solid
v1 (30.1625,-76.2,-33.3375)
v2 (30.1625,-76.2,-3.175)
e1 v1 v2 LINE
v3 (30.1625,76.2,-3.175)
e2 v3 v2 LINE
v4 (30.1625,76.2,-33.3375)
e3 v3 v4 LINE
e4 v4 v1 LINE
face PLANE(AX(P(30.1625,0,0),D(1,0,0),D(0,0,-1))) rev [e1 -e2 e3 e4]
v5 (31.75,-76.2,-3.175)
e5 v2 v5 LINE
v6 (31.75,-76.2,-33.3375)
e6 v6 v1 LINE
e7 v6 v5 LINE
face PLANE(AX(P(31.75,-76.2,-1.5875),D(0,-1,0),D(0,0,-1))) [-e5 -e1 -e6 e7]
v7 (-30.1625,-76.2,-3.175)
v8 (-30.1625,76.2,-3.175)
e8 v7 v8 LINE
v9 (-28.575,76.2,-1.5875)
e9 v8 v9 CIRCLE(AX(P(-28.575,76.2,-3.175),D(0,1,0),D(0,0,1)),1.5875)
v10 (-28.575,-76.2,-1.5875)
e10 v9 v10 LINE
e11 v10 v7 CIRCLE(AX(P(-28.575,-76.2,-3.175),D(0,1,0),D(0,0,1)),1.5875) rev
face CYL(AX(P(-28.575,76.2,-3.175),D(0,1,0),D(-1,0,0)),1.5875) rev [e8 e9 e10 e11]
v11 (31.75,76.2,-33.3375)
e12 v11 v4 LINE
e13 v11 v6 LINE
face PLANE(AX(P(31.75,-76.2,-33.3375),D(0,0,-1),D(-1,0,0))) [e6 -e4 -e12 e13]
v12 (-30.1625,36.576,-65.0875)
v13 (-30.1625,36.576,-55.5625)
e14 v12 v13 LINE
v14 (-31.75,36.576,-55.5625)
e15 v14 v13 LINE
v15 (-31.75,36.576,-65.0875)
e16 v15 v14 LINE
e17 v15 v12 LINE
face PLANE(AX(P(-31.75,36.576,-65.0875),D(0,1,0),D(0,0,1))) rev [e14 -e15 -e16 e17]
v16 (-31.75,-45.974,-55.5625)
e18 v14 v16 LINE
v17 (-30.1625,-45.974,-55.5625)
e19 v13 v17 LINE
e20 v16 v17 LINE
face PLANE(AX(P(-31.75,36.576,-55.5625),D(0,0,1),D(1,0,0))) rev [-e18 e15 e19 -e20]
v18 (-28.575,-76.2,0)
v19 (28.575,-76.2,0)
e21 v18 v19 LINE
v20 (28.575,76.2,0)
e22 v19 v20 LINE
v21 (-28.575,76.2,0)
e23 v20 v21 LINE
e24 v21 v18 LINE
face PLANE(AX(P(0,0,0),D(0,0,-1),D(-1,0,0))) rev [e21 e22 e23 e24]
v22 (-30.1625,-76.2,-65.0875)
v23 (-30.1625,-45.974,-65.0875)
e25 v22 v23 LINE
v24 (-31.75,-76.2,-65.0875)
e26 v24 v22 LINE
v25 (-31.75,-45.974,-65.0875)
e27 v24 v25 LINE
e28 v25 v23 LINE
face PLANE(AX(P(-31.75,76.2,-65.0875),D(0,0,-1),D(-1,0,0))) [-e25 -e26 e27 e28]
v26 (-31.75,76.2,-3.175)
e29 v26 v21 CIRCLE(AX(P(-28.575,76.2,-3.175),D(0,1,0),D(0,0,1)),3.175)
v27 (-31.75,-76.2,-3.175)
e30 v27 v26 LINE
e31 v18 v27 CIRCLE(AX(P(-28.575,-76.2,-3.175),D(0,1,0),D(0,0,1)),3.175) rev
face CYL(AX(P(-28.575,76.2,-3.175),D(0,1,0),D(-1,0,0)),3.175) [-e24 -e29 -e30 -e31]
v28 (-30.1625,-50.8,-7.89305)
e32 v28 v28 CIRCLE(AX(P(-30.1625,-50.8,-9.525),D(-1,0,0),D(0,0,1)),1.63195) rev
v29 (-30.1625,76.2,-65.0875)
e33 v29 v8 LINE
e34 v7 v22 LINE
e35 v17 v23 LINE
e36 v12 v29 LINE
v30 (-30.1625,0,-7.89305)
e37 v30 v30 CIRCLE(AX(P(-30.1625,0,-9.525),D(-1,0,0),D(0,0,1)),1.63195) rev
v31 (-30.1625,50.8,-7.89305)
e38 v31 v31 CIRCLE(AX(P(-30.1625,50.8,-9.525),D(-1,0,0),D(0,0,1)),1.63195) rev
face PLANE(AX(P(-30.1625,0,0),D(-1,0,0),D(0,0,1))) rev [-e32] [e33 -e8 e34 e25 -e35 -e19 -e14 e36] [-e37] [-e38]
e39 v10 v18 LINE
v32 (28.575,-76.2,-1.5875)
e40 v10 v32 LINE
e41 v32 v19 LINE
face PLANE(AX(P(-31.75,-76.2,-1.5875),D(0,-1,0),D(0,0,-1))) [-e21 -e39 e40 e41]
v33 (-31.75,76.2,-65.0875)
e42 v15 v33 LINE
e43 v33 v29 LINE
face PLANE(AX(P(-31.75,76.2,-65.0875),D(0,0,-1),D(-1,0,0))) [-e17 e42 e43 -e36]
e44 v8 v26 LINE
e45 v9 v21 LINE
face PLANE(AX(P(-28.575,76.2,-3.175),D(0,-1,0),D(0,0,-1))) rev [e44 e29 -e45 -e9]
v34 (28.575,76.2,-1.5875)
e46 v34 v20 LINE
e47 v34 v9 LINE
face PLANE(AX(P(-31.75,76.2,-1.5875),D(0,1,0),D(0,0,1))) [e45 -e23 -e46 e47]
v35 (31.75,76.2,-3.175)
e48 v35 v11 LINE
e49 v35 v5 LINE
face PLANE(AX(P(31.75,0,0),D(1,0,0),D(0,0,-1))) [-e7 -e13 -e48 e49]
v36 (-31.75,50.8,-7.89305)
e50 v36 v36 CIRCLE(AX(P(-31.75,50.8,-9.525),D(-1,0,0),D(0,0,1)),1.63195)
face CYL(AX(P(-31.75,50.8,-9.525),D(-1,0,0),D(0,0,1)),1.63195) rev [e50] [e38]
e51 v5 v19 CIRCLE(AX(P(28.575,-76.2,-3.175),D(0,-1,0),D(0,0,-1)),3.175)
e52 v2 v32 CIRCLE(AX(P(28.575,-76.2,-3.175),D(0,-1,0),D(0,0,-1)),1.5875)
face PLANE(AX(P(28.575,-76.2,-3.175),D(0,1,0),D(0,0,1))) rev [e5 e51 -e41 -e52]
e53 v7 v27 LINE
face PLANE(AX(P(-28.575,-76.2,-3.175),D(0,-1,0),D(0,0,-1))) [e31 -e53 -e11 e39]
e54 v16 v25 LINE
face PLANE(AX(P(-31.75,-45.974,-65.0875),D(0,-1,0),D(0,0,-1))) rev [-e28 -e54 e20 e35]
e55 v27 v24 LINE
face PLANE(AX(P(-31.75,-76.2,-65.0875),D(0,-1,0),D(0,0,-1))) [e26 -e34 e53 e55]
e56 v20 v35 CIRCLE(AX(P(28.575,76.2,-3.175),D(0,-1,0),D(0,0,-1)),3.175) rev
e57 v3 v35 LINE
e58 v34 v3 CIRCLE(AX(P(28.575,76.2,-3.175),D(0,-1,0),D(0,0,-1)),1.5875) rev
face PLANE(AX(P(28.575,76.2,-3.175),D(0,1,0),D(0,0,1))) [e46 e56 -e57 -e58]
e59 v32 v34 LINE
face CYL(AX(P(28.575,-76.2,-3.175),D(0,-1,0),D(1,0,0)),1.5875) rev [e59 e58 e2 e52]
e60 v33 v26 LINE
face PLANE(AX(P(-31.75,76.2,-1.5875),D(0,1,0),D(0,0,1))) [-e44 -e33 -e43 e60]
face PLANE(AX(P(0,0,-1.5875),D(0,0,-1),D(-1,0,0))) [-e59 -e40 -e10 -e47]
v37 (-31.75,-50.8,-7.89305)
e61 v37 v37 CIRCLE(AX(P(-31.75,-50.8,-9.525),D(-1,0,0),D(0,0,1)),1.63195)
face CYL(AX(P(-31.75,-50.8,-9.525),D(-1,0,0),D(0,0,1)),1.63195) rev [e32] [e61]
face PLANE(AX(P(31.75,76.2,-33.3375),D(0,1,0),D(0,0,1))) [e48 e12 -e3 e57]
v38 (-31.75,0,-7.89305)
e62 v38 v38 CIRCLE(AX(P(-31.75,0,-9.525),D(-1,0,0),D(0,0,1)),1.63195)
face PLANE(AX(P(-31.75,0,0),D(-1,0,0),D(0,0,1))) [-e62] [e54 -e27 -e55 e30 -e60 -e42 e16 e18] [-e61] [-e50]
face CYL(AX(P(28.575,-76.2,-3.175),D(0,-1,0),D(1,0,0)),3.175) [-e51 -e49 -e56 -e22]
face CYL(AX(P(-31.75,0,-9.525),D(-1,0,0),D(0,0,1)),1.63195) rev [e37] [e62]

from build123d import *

# Parameters (mm, degrees)
SKETCH1_W                    = 63.5
SKETCH1_H                    = 152.4
BASE_FLANGE1_DEPTH           = 1.5875
EDGE_FLANGE1_STRIP_W         = 9.525
EDGE_FLANGE1_STRIP_H         = 1.5875
EDGE_FLANGE1_STRIP_CUT_DEPTH = 152.4
EDGE_FLANGE1_DEPTH           = 152.4
EDGE_FLANGE2_STRIP_W         = 9.525
EDGE_FLANGE2_STRIP_H         = 1.5875
EDGE_FLANGE2_STRIP_CUT_DEPTH = 152.4
EDGE_FLANGE2_DEPTH           = 152.4
F_4_CLEARANCE_HOLE1_REACH    = 120.638
F_4_CLEARANCE_HOLE1_BORE_R   = 1.63195
SKETCH16_W                   = 9.525
SKETCH16_H                   = 82.55
CUT_EXTRUDE1_DEPTH           = 118.796351015


# Sheet-metal steps are written as plain solids
with BuildPart() as part:
    # Sketch1 → Base-Flange1 (new body)
    with BuildSketch(Plane.XY):
        Rectangle(SKETCH1_W, SKETCH1_H)
    extrude(amount=-BASE_FLANGE1_DEPTH)

    # Edge-Flange1 strip (across the edge) → Edge-Flange1 strip cut (cut)
    with BuildSketch(Plane(origin=(31.75, 76.2, -1.5875), x_dir=(-1, 0, 0), z_dir=(0, -1, 0))):
        with Locations((-1.5875, -0.79375)):
            Rectangle(EDGE_FLANGE1_STRIP_W, EDGE_FLANGE1_STRIP_H)
    extrude(amount=EDGE_FLANGE1_STRIP_CUT_DEPTH, mode=Mode.SUBTRACT)

    # Edge-Flange1 section (across the edge) → Edge-Flange1 (add)
    with BuildSketch(Plane(origin=(31.75, 76.2, -1.5875), x_dir=(-1, 0, 0), z_dir=(0, -1, 0))):
        with BuildLine():
            Line((0, 1.5875), (0, 31.75))
            Line((0, 31.75), (1.5875, 31.75))
            Line((1.5875, 31.75), (1.5875, 1.5875))
            ThreePointArc((1.5875, 1.5875), (2.052467985, 0.464967985), (3.175, 0))
            Line((3.175, 0), (3.175, -1.5875))
            ThreePointArc((3.175, -1.5875), (0.92993597, -0.65756403), (0, 1.5875))
        make_face()
    extrude(amount=EDGE_FLANGE1_DEPTH)

    # Edge-Flange2 strip (across the edge) → Edge-Flange2 strip cut (cut)
    with BuildSketch(Plane(origin=(-31.75, -76.2, -1.5875), x_dir=(1, 0, 0), z_dir=(0, 1, 0))):
        with Locations((-1.5875, -0.79375)):
            Rectangle(EDGE_FLANGE2_STRIP_W, EDGE_FLANGE2_STRIP_H)
    extrude(amount=EDGE_FLANGE2_STRIP_CUT_DEPTH, mode=Mode.SUBTRACT)

    # Edge-Flange2 section (across the edge) → Edge-Flange2 (add)
    with BuildSketch(Plane(origin=(-31.75, -76.2, -1.5875), x_dir=(1, 0, 0), z_dir=(0, 1, 0))):
        with BuildLine():
            Line((0, 1.5875), (0, 63.5))
            Line((0, 63.5), (1.5875, 63.5))
            Line((1.5875, 63.5), (1.5875, 1.5875))
            ThreePointArc((1.5875, 1.5875), (2.052467985, 0.464967985), (3.175, 0))
            Line((3.175, 0), (3.175, -1.5875))
            ThreePointArc((3.175, -1.5875), (0.92993597, -0.65756403), (0, 1.5875))
        make_face()
    extrude(amount=EDGE_FLANGE2_DEPTH)

    # #4 Clearance Hole1 bore → #4 Clearance Hole1 (cut, up to next)
    with BuildSketch(Plane.ZY.offset(31.75), mode=Mode.PRIVATE) as f_4_clearance_hole1_sk1:
        with Locations((-9.525, -50.8)):
            Circle(F_4_CLEARANCE_HOLE1_BORE_R)
    f_4_clearance_hole1_tool1 = extrude(f_4_clearance_hole1_sk1.sketch, amount=-F_4_CLEARANCE_HOLE1_REACH, mode=Mode.PRIVATE) & part.part
    # #4 Clearance Hole1 bore → #4 Clearance Hole1 (cut, up to next)
    with BuildSketch(Plane.ZY.offset(31.75), mode=Mode.PRIVATE) as f_4_clearance_hole1_sk2:
        with Locations((-9.525, 0)):
            Circle(F_4_CLEARANCE_HOLE1_BORE_R)
    f_4_clearance_hole1_tool2 = extrude(f_4_clearance_hole1_sk2.sketch, amount=-F_4_CLEARANCE_HOLE1_REACH, mode=Mode.PRIVATE) & part.part
    # #4 Clearance Hole1 bore → #4 Clearance Hole1 (cut, up to next)
    with BuildSketch(Plane.ZY.offset(31.75), mode=Mode.PRIVATE) as f_4_clearance_hole1_sk3:
        with Locations((-9.525, 50.8)):
            Circle(F_4_CLEARANCE_HOLE1_BORE_R)
    f_4_clearance_hole1_tool3 = extrude(f_4_clearance_hole1_sk3.sketch, amount=-F_4_CLEARANCE_HOLE1_REACH, mode=Mode.PRIVATE) & part.part
    add(f_4_clearance_hole1_tool1.solids().sort_by_distance((-31.75, -50.8, -9.525))[0], mode=Mode.SUBTRACT)
    add(f_4_clearance_hole1_tool2.solids().sort_by_distance((-31.75, 0, -9.525))[0], mode=Mode.SUBTRACT)
    add(f_4_clearance_hole1_tool3.solids().sort_by_distance((-31.75, 50.8, -9.525))[0], mode=Mode.SUBTRACT)

    # Sketch16 → Cut-Extrude1 (cut, through all)
    with BuildSketch(Plane(origin=(-30.1625, 0, 0), x_dir=(0, 0, -1), z_dir=(1, 0, 0))):
        with Locations((60.325, -4.699)):
            Rectangle(SKETCH16_W, SKETCH16_H)
    extrude(amount=-CUT_EXTRUDE1_DEPTH, mode=Mode.SUBTRACT)


solid = part.part
